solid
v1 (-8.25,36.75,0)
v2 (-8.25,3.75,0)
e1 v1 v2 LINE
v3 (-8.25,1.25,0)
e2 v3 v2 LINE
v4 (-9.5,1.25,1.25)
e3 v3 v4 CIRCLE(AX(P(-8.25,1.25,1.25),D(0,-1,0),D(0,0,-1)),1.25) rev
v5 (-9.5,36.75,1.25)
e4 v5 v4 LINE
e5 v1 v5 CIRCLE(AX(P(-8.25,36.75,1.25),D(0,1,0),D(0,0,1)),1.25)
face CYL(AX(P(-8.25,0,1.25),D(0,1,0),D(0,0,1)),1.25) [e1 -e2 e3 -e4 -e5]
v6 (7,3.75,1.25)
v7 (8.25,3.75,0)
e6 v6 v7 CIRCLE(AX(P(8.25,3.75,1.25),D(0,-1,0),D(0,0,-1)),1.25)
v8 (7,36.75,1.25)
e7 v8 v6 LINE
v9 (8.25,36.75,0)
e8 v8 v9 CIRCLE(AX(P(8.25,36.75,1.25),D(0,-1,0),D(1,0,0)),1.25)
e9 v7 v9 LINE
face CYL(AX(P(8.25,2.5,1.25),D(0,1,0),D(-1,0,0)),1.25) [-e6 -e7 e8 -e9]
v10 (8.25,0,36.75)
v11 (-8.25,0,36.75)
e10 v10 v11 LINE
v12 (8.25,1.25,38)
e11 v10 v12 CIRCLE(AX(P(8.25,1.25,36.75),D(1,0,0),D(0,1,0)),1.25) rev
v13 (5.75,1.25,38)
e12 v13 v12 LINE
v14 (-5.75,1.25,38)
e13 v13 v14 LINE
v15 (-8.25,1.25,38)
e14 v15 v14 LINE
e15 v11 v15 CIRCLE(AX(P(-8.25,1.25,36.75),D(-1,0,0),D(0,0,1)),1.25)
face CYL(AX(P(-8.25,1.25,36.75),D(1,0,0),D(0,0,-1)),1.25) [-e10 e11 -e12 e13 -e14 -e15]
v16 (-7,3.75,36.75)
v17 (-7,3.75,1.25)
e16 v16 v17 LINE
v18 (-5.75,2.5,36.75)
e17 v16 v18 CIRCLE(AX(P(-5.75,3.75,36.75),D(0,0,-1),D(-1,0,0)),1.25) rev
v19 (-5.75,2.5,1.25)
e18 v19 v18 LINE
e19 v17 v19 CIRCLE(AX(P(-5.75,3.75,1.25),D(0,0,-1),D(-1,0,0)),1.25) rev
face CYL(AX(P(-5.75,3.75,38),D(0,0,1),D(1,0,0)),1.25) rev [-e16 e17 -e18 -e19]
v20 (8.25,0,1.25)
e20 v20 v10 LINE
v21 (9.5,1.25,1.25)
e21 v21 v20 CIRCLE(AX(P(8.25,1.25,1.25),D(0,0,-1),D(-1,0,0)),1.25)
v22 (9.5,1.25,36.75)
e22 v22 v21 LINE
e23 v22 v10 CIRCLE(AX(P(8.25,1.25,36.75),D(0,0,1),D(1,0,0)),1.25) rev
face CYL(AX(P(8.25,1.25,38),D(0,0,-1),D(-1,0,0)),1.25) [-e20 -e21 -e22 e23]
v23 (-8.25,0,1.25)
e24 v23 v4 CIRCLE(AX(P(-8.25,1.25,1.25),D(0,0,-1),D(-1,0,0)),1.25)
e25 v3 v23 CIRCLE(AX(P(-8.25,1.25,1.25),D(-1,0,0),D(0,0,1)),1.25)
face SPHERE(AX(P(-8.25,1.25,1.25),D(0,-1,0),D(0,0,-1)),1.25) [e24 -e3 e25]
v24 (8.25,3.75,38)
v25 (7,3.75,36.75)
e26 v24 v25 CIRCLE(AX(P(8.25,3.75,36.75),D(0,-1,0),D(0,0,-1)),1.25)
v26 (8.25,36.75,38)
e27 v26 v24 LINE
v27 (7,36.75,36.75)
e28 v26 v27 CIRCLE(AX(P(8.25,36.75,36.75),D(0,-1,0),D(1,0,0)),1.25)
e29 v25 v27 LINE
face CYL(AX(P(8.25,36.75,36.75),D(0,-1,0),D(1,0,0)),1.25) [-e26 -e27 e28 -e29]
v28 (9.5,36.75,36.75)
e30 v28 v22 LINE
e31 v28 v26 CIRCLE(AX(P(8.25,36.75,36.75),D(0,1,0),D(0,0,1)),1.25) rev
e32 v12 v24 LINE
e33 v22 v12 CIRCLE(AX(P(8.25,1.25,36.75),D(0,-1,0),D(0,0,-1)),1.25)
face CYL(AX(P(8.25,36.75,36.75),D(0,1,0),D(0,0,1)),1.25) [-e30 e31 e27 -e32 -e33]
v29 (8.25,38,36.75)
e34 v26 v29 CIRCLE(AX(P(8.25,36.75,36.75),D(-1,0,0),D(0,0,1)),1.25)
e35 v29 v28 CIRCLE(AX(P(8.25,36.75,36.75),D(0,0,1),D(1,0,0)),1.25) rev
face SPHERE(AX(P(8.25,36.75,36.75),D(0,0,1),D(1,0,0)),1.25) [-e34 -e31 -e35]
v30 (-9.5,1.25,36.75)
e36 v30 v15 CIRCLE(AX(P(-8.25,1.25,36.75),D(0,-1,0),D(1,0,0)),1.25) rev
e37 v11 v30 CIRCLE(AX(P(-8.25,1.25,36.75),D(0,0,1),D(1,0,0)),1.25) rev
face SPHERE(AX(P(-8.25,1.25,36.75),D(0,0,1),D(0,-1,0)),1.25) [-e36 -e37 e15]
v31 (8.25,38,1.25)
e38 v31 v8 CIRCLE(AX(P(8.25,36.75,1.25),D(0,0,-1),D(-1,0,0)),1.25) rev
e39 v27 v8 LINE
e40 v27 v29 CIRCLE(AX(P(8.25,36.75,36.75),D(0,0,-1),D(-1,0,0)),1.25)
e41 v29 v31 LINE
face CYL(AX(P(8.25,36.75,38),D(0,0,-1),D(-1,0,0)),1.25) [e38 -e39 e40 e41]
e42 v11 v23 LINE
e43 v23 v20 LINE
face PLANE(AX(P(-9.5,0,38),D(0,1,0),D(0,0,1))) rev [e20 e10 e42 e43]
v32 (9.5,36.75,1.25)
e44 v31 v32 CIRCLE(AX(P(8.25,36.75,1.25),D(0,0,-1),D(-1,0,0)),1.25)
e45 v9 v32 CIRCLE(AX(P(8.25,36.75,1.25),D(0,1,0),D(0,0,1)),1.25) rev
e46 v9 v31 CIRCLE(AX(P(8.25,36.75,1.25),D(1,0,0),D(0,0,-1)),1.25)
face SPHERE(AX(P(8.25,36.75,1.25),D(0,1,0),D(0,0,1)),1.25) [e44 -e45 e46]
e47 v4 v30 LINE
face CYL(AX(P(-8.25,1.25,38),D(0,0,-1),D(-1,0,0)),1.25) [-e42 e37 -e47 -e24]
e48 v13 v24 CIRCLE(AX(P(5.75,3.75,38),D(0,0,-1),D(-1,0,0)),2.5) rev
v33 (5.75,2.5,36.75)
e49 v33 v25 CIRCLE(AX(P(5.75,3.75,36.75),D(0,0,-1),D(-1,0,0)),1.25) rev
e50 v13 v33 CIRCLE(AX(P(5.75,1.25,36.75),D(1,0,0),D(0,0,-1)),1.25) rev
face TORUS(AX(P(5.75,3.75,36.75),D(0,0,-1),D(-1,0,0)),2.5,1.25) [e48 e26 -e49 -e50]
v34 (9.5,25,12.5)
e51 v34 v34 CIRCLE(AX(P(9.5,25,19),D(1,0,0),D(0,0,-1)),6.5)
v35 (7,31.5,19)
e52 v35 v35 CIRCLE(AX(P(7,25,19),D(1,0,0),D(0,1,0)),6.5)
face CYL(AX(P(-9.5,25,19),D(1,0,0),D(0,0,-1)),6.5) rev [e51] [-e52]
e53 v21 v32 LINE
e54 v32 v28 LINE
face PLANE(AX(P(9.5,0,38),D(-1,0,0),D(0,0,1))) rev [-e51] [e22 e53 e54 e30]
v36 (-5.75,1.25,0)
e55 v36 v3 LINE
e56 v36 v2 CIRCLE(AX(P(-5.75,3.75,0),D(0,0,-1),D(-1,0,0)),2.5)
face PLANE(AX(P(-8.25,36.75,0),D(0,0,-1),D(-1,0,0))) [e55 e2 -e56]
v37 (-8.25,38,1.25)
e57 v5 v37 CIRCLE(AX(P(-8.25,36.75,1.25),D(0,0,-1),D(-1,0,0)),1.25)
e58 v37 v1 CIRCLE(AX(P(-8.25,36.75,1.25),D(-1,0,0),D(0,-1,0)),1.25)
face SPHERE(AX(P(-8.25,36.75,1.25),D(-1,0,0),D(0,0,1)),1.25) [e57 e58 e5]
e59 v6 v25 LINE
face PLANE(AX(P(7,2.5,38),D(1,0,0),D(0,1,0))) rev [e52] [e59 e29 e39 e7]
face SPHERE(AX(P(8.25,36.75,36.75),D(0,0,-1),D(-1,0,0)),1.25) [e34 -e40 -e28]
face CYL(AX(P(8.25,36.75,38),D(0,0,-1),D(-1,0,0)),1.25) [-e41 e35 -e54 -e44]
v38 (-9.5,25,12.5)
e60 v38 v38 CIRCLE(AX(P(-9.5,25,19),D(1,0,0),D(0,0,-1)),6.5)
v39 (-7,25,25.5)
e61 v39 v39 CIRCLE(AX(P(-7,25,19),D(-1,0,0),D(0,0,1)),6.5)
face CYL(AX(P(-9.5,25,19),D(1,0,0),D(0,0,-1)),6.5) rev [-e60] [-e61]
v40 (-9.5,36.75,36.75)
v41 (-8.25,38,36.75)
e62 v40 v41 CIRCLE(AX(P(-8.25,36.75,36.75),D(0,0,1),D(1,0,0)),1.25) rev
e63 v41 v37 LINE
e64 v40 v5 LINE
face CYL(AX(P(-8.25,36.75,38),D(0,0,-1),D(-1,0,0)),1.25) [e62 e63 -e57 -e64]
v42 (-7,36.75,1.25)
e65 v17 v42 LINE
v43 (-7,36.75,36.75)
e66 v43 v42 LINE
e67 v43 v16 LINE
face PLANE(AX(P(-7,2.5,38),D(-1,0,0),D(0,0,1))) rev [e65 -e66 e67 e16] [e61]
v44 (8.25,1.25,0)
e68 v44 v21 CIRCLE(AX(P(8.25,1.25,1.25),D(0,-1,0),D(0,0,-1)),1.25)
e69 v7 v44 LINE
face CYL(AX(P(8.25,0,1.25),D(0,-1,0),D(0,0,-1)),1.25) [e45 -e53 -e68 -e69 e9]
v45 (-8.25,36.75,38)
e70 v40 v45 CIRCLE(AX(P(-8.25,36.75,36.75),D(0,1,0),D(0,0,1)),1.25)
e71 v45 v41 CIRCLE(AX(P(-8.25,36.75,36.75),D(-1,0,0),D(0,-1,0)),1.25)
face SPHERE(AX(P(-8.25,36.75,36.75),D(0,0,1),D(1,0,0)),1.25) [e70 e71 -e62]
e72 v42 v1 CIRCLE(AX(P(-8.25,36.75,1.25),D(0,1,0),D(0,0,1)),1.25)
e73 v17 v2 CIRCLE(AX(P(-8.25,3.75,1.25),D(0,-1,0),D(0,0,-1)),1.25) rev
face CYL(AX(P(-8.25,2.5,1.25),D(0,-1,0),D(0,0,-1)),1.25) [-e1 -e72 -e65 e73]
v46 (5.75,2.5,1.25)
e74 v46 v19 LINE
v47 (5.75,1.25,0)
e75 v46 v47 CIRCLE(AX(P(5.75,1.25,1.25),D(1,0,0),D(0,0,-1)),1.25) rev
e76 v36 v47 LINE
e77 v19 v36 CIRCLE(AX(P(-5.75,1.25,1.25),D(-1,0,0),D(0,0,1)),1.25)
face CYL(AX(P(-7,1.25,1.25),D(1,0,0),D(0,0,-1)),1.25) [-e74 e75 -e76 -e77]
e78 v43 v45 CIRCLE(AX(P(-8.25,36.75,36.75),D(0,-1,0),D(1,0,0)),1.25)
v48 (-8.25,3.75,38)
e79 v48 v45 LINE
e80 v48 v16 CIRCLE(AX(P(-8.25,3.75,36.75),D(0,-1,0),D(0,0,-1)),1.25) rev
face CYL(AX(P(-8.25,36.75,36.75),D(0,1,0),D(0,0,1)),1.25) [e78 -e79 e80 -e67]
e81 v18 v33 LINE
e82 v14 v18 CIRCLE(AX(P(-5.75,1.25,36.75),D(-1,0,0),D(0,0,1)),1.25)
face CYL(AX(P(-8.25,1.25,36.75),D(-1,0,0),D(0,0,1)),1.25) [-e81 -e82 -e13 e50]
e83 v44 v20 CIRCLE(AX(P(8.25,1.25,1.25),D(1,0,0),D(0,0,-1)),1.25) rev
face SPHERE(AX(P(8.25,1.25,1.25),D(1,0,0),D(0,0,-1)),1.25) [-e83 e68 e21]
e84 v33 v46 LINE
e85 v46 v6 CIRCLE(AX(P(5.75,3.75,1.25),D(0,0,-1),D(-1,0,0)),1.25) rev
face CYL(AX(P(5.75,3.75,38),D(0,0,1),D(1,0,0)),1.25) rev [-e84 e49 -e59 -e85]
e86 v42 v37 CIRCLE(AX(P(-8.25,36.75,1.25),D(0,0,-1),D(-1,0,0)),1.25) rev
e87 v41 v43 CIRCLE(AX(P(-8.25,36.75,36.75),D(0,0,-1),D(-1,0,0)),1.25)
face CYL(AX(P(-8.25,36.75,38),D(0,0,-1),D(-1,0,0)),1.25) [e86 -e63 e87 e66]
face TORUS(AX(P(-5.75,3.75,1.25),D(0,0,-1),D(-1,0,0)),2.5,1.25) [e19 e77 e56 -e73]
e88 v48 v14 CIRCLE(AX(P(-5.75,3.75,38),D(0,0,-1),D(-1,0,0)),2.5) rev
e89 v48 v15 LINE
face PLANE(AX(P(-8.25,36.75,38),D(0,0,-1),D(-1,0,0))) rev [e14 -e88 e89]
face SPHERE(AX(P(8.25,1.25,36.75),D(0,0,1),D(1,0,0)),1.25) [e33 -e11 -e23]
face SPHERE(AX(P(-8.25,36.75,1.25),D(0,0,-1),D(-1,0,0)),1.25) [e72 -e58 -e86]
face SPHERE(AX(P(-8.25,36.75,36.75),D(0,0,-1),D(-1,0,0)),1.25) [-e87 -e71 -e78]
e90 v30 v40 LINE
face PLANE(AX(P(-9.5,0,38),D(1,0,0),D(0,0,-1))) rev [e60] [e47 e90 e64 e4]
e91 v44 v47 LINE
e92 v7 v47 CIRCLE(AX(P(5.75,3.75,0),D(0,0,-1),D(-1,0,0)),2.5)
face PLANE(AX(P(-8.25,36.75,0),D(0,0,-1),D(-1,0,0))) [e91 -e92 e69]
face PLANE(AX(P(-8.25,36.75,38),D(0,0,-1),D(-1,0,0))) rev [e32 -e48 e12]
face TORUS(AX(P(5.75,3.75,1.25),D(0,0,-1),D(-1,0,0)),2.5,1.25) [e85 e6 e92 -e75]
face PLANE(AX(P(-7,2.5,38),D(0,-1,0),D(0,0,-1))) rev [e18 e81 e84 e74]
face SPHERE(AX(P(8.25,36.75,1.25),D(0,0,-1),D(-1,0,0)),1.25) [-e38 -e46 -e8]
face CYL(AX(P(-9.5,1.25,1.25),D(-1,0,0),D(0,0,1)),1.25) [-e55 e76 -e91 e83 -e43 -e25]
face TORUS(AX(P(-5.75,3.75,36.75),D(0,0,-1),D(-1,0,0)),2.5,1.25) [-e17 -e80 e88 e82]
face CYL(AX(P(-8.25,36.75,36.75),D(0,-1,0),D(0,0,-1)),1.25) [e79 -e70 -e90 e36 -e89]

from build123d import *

# Parameters (mm, degrees)
BOSS_EXTRUDE1_DEPTH = 38
SKETCH2_R           = 6.5
CUT_EXTRUDE1_DEPTH  = 58
FILLET1_R           = 1.25


with BuildPart() as part:
    # Sketch1 → Boss-Extrude1 (new body)
    with BuildSketch(Plane.XY):
        with BuildLine():
            Line((-9.5, 0), (9.5, 0))
            Line((9.5, 0), (9.5, 38))
            Line((9.5, 38), (8.25, 38))
            ThreePointArc((8.25, 38), (7.366116524, 37.633883476), (7, 36.75))
            Line((7, 36.75), (7, 2.5))
            Line((7, 2.5), (-7, 2.5))
            Line((-7, 2.5), (-7, 36.75))
            ThreePointArc((-7, 36.75), (-7.366116524, 37.633883476), (-8.25, 38))
            Line((-8.25, 38), (-9.5, 38))
            Line((-9.5, 38), (-9.5, 0))
        make_face()
    extrude(amount=BOSS_EXTRUDE1_DEPTH)

    # Sketch2 → Cut-Extrude1 (cut, through all)
    with BuildSketch(Plane(origin=(9.5, 0, 0), x_dir=(0, 0, -1), z_dir=(1, 0, 0))):
        with Locations((-19, 25)):
            Circle(SKETCH2_R)
    extrude(amount=-CUT_EXTRUDE1_DEPTH, mode=Mode.SUBTRACT)

    # Fillet1
    fillet1_edges = [part.edges().sort_by_distance(p)[0] for p in [
        (-7.366116524, 37.633883476, 0),
        (7.366116524, 37.633883476, 0),
        (7.366116524, 37.633883476, 38),
        (-7.366116524, 37.633883476, 38),
        (-9.5, 0, 19),
        (7, 2.5, 19),
        (-7, 2.5, 19),
        (-7, 19.625, 0),
        (-9.5, 19, 0),
        (0, 0, 0),
        (0, 2.5, 0),
        (7, 19.625, 0),
        (9.5, 19, 0),
        (9.5, 0, 19),
        (0, 0, 38),
        (-9.5, 19, 38),
        (-9.5, 38, 19),
        (9.5, 38, 19),
        (9.5, 19, 38),
        (7, 19.625, 38),
        (-7, 19.625, 38),
        (0, 2.5, 38),
    ]]
    fillet(fillet1_edges, radius=FILLET1_R - 0.0001)  # a hair under: the kernel refuses the full size


solid = part.part
